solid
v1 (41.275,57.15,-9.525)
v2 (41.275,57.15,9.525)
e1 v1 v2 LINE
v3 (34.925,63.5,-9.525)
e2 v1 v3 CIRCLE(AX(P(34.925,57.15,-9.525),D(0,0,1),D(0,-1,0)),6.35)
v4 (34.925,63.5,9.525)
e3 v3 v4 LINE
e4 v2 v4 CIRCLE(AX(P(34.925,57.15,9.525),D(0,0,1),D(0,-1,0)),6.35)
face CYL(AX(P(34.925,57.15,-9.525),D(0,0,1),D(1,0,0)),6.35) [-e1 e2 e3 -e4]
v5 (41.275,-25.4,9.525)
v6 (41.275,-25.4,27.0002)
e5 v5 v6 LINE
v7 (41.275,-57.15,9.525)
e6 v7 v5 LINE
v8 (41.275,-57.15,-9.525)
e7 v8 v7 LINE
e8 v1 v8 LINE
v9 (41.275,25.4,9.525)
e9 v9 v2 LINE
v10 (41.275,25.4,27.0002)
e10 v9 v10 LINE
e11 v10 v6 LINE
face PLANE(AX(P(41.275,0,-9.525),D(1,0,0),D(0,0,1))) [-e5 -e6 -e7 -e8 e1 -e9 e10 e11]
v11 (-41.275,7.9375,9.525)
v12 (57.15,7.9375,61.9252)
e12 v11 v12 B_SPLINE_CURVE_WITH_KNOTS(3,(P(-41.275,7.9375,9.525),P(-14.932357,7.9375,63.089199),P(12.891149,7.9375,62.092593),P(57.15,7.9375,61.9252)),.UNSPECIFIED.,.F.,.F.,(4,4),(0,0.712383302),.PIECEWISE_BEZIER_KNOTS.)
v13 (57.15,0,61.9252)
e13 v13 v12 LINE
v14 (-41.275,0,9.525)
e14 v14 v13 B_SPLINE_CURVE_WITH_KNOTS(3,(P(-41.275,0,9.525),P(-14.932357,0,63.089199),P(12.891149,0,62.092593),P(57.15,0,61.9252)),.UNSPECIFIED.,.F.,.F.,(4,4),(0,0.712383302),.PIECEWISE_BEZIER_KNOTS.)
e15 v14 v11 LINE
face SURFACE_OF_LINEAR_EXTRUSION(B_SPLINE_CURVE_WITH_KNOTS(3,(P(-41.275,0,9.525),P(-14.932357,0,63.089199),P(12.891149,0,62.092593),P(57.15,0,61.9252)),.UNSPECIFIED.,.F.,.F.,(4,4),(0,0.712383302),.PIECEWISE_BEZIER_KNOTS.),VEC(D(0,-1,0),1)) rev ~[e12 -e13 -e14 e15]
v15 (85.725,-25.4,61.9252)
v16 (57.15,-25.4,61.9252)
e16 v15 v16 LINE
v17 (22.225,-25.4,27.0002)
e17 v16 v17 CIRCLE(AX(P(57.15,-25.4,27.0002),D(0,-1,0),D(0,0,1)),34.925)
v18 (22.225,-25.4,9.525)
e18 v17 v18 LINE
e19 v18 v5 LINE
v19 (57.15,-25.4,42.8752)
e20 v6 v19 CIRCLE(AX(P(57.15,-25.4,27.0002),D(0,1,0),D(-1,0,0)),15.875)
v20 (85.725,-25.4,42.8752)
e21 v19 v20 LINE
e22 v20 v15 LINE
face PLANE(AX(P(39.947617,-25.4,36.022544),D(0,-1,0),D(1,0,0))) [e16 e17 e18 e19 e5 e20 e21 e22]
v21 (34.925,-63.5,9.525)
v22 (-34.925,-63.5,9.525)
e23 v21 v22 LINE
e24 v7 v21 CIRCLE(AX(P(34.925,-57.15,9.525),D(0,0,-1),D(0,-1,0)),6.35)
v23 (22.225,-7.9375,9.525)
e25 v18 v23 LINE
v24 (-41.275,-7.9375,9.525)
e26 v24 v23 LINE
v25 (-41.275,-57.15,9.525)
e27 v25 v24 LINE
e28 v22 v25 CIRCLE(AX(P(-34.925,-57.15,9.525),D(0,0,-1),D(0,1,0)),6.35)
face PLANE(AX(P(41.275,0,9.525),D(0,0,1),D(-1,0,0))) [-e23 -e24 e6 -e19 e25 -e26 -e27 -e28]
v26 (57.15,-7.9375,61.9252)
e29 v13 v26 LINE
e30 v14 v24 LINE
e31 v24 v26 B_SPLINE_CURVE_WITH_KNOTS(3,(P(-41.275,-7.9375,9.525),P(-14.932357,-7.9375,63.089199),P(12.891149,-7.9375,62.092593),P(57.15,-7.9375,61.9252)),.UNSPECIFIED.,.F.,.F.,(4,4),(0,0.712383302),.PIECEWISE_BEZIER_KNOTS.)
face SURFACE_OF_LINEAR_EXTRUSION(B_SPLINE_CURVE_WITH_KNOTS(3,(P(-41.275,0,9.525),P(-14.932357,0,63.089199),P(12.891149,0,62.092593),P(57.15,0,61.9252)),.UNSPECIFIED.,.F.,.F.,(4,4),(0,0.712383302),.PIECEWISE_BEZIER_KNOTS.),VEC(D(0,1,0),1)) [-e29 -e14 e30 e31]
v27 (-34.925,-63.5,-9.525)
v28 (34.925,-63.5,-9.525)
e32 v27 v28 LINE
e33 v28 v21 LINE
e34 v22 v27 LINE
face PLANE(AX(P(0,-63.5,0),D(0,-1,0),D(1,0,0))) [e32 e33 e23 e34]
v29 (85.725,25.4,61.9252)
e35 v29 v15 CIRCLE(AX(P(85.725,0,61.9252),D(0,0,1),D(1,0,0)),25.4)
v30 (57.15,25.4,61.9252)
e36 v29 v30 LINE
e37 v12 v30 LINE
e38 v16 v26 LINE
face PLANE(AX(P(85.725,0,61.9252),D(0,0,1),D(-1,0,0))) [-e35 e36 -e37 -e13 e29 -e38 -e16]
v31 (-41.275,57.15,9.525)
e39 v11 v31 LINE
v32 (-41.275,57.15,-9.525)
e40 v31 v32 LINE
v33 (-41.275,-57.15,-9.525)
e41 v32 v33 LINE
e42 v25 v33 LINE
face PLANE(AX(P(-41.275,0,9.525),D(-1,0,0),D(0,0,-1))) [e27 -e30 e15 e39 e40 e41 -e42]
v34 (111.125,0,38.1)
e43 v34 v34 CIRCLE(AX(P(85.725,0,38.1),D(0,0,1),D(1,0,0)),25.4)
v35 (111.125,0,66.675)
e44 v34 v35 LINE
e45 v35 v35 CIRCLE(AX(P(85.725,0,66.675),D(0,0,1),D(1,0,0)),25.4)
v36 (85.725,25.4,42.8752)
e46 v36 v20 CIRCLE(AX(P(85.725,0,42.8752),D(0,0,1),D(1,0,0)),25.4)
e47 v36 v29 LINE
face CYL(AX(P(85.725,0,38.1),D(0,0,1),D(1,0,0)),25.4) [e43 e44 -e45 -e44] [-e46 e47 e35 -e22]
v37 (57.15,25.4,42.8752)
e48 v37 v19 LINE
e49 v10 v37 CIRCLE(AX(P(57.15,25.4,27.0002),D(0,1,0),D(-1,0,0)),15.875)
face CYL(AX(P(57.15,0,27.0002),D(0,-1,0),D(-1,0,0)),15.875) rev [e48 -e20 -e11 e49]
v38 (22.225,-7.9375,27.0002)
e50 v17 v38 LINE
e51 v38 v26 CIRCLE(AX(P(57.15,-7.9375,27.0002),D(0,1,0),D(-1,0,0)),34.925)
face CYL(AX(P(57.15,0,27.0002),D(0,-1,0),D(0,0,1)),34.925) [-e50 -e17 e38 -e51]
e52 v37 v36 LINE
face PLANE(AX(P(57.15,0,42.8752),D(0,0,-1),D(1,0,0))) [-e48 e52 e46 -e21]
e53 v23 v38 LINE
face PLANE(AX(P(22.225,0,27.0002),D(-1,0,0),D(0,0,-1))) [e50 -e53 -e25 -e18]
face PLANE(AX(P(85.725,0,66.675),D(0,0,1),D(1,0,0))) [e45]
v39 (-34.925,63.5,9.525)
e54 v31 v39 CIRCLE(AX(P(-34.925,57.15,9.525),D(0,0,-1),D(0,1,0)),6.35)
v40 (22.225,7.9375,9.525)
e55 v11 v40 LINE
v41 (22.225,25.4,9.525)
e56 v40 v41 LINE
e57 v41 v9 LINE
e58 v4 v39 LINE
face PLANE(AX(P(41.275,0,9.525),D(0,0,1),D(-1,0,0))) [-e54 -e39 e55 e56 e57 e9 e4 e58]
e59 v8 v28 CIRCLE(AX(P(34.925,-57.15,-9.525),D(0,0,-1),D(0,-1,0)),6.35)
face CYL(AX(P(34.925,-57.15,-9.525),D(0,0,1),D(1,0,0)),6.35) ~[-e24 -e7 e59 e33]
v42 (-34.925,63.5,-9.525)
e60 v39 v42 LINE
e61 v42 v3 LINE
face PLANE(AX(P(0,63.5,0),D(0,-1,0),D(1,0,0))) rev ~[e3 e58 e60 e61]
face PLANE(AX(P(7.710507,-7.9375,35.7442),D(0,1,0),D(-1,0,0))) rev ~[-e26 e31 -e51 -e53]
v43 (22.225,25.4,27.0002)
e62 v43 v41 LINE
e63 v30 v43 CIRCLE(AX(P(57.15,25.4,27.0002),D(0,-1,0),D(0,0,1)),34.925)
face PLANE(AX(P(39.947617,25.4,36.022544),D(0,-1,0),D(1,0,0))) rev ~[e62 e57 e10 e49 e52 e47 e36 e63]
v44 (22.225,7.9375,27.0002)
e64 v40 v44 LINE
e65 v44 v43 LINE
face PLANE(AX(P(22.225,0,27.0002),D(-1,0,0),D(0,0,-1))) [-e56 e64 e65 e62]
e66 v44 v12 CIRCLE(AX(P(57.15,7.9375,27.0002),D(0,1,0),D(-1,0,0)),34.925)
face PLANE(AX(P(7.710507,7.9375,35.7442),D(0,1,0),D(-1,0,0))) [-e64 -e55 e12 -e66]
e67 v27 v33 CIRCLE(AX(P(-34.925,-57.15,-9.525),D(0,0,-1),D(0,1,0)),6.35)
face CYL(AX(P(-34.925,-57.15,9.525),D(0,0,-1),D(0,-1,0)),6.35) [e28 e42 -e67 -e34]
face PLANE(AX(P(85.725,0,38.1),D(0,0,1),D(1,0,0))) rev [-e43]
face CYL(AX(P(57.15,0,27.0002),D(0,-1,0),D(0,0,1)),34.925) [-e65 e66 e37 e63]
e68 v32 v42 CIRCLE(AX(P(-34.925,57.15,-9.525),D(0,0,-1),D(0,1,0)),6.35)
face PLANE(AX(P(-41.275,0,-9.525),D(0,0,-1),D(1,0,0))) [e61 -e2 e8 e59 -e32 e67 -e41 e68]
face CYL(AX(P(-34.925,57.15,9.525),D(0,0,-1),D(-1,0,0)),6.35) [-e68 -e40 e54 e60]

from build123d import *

# Parameters (mm, degrees)
F1_DEPTH = 63.5
F2_DEPTH = 25.4
F3_DEPTH = 7.9375
F5_R     = 6.35


with BuildPart() as f1:
    # F0 (on Front) → F1 (new body, symmetric)
    with BuildSketch(Plane.XZ):
        Polygon((-41.275, 9.525), (-41.275, -9.525), (41.275, -9.525), (41.275, 9.525), (22.225, 9.525), align=None)
    extrude(amount=F1_DEPTH, both=True)

    # F0 (on Front) → F2 (join, symmetric)
    with BuildSketch(Plane.XZ):
        with BuildLine():
            Line((22.225, 9.525), (41.275, 9.525))
            Line((41.275, 9.525), (41.275, 27.0002))
            ThreePointArc((41.275, 27.0002), (45.9246798487, 38.2255201513), (57.15, 42.8752))
            Line((57.15, 42.8752), (60.325, 42.8752))
            Line((60.325, 42.8752), (60.325, 61.9118876984))
            add(Edge.make_bspline(
                [(57.15, 61.9252), (58.2024017722, 61.9212196773), (59.2640962396, 61.9177081997), (60.325, 61.9118876984)],
                knots=[0.7123833019, 0.7123833019, 0.7123833019, 0.7123833019, 0.7293225906, 0.7293225906, 0.7293225906, 0.7293225906], degree=3))
            ThreePointArc((57.15, 61.9252), (32.4542956671, 51.6959043329), (22.225, 27.0002))
            Line((22.225, 27.0002), (22.225, 9.525))
        make_face()
        with BuildLine():
            Line((60.325, 61.9252), (57.15, 61.9252))
            add(Edge.make_bspline(
                [(57.15, 61.9252), (58.2024017722, 61.9212196773), (59.2640962396, 61.9177081997), (60.325, 61.9118876984)],
                knots=[0.7123833019, 0.7123833019, 0.7123833019, 0.7123833019, 0.7293225906, 0.7293225906, 0.7293225906, 0.7293225906], degree=3))
            Line((60.325, 61.9118876984), (60.325, 61.9252))
        make_face()
        Polygon((85.725, 61.9252), (60.325, 61.9252), (60.325, 61.9118876984), (60.325, 42.8752), (85.725, 42.8752), align=None)
    extrude(amount=F2_DEPTH, both=True)

    # F0 (on Front) → F3 (join, symmetric)
    with BuildSketch(Plane.XZ):
        with BuildLine():
            add(Edge.make_bspline(
                [(-41.275, 9.525), (-14.9323567748, 63.0891993642), (12.8911493683, 62.0925928269), (57.15, 61.9252)],
                knots=[0, 0, 0, 0, 0.7123833019, 0.7123833019, 0.7123833019, 0.7123833019], degree=3))
            Line((-41.275, 9.525), (22.225, 9.525))
            Line((22.225, 9.525), (22.225, 27.0002))
            ThreePointArc((22.225, 27.0002), (32.4542956671, 51.6959043329), (57.15, 61.9252))
        make_face()
    extrude(amount=F3_DEPTH, both=True)

    # F0 (on Front) → F4 (revolve)
    with BuildSketch(Plane.XZ):
        Polygon((85.725, 66.675), (85.725, 61.9252), (85.725, 42.8752), (85.725, 38.1), (111.125, 38.1), (111.125, 66.675), align=None)
    revolve(axis=Axis((85.725, 0, 52.3875), (0, 0, 1)))

    # F5
    f5_edges = [f1.edges().sort_by_distance(p)[0] for p in [
        (-41.275, -63.5, 0),
        (41.275, -63.5, 0),
        (41.275, 63.5, 0),
        (-41.275, 63.5, 0),
    ]]
    fillet(f5_edges, radius=F5_R)


solid = f1.part
